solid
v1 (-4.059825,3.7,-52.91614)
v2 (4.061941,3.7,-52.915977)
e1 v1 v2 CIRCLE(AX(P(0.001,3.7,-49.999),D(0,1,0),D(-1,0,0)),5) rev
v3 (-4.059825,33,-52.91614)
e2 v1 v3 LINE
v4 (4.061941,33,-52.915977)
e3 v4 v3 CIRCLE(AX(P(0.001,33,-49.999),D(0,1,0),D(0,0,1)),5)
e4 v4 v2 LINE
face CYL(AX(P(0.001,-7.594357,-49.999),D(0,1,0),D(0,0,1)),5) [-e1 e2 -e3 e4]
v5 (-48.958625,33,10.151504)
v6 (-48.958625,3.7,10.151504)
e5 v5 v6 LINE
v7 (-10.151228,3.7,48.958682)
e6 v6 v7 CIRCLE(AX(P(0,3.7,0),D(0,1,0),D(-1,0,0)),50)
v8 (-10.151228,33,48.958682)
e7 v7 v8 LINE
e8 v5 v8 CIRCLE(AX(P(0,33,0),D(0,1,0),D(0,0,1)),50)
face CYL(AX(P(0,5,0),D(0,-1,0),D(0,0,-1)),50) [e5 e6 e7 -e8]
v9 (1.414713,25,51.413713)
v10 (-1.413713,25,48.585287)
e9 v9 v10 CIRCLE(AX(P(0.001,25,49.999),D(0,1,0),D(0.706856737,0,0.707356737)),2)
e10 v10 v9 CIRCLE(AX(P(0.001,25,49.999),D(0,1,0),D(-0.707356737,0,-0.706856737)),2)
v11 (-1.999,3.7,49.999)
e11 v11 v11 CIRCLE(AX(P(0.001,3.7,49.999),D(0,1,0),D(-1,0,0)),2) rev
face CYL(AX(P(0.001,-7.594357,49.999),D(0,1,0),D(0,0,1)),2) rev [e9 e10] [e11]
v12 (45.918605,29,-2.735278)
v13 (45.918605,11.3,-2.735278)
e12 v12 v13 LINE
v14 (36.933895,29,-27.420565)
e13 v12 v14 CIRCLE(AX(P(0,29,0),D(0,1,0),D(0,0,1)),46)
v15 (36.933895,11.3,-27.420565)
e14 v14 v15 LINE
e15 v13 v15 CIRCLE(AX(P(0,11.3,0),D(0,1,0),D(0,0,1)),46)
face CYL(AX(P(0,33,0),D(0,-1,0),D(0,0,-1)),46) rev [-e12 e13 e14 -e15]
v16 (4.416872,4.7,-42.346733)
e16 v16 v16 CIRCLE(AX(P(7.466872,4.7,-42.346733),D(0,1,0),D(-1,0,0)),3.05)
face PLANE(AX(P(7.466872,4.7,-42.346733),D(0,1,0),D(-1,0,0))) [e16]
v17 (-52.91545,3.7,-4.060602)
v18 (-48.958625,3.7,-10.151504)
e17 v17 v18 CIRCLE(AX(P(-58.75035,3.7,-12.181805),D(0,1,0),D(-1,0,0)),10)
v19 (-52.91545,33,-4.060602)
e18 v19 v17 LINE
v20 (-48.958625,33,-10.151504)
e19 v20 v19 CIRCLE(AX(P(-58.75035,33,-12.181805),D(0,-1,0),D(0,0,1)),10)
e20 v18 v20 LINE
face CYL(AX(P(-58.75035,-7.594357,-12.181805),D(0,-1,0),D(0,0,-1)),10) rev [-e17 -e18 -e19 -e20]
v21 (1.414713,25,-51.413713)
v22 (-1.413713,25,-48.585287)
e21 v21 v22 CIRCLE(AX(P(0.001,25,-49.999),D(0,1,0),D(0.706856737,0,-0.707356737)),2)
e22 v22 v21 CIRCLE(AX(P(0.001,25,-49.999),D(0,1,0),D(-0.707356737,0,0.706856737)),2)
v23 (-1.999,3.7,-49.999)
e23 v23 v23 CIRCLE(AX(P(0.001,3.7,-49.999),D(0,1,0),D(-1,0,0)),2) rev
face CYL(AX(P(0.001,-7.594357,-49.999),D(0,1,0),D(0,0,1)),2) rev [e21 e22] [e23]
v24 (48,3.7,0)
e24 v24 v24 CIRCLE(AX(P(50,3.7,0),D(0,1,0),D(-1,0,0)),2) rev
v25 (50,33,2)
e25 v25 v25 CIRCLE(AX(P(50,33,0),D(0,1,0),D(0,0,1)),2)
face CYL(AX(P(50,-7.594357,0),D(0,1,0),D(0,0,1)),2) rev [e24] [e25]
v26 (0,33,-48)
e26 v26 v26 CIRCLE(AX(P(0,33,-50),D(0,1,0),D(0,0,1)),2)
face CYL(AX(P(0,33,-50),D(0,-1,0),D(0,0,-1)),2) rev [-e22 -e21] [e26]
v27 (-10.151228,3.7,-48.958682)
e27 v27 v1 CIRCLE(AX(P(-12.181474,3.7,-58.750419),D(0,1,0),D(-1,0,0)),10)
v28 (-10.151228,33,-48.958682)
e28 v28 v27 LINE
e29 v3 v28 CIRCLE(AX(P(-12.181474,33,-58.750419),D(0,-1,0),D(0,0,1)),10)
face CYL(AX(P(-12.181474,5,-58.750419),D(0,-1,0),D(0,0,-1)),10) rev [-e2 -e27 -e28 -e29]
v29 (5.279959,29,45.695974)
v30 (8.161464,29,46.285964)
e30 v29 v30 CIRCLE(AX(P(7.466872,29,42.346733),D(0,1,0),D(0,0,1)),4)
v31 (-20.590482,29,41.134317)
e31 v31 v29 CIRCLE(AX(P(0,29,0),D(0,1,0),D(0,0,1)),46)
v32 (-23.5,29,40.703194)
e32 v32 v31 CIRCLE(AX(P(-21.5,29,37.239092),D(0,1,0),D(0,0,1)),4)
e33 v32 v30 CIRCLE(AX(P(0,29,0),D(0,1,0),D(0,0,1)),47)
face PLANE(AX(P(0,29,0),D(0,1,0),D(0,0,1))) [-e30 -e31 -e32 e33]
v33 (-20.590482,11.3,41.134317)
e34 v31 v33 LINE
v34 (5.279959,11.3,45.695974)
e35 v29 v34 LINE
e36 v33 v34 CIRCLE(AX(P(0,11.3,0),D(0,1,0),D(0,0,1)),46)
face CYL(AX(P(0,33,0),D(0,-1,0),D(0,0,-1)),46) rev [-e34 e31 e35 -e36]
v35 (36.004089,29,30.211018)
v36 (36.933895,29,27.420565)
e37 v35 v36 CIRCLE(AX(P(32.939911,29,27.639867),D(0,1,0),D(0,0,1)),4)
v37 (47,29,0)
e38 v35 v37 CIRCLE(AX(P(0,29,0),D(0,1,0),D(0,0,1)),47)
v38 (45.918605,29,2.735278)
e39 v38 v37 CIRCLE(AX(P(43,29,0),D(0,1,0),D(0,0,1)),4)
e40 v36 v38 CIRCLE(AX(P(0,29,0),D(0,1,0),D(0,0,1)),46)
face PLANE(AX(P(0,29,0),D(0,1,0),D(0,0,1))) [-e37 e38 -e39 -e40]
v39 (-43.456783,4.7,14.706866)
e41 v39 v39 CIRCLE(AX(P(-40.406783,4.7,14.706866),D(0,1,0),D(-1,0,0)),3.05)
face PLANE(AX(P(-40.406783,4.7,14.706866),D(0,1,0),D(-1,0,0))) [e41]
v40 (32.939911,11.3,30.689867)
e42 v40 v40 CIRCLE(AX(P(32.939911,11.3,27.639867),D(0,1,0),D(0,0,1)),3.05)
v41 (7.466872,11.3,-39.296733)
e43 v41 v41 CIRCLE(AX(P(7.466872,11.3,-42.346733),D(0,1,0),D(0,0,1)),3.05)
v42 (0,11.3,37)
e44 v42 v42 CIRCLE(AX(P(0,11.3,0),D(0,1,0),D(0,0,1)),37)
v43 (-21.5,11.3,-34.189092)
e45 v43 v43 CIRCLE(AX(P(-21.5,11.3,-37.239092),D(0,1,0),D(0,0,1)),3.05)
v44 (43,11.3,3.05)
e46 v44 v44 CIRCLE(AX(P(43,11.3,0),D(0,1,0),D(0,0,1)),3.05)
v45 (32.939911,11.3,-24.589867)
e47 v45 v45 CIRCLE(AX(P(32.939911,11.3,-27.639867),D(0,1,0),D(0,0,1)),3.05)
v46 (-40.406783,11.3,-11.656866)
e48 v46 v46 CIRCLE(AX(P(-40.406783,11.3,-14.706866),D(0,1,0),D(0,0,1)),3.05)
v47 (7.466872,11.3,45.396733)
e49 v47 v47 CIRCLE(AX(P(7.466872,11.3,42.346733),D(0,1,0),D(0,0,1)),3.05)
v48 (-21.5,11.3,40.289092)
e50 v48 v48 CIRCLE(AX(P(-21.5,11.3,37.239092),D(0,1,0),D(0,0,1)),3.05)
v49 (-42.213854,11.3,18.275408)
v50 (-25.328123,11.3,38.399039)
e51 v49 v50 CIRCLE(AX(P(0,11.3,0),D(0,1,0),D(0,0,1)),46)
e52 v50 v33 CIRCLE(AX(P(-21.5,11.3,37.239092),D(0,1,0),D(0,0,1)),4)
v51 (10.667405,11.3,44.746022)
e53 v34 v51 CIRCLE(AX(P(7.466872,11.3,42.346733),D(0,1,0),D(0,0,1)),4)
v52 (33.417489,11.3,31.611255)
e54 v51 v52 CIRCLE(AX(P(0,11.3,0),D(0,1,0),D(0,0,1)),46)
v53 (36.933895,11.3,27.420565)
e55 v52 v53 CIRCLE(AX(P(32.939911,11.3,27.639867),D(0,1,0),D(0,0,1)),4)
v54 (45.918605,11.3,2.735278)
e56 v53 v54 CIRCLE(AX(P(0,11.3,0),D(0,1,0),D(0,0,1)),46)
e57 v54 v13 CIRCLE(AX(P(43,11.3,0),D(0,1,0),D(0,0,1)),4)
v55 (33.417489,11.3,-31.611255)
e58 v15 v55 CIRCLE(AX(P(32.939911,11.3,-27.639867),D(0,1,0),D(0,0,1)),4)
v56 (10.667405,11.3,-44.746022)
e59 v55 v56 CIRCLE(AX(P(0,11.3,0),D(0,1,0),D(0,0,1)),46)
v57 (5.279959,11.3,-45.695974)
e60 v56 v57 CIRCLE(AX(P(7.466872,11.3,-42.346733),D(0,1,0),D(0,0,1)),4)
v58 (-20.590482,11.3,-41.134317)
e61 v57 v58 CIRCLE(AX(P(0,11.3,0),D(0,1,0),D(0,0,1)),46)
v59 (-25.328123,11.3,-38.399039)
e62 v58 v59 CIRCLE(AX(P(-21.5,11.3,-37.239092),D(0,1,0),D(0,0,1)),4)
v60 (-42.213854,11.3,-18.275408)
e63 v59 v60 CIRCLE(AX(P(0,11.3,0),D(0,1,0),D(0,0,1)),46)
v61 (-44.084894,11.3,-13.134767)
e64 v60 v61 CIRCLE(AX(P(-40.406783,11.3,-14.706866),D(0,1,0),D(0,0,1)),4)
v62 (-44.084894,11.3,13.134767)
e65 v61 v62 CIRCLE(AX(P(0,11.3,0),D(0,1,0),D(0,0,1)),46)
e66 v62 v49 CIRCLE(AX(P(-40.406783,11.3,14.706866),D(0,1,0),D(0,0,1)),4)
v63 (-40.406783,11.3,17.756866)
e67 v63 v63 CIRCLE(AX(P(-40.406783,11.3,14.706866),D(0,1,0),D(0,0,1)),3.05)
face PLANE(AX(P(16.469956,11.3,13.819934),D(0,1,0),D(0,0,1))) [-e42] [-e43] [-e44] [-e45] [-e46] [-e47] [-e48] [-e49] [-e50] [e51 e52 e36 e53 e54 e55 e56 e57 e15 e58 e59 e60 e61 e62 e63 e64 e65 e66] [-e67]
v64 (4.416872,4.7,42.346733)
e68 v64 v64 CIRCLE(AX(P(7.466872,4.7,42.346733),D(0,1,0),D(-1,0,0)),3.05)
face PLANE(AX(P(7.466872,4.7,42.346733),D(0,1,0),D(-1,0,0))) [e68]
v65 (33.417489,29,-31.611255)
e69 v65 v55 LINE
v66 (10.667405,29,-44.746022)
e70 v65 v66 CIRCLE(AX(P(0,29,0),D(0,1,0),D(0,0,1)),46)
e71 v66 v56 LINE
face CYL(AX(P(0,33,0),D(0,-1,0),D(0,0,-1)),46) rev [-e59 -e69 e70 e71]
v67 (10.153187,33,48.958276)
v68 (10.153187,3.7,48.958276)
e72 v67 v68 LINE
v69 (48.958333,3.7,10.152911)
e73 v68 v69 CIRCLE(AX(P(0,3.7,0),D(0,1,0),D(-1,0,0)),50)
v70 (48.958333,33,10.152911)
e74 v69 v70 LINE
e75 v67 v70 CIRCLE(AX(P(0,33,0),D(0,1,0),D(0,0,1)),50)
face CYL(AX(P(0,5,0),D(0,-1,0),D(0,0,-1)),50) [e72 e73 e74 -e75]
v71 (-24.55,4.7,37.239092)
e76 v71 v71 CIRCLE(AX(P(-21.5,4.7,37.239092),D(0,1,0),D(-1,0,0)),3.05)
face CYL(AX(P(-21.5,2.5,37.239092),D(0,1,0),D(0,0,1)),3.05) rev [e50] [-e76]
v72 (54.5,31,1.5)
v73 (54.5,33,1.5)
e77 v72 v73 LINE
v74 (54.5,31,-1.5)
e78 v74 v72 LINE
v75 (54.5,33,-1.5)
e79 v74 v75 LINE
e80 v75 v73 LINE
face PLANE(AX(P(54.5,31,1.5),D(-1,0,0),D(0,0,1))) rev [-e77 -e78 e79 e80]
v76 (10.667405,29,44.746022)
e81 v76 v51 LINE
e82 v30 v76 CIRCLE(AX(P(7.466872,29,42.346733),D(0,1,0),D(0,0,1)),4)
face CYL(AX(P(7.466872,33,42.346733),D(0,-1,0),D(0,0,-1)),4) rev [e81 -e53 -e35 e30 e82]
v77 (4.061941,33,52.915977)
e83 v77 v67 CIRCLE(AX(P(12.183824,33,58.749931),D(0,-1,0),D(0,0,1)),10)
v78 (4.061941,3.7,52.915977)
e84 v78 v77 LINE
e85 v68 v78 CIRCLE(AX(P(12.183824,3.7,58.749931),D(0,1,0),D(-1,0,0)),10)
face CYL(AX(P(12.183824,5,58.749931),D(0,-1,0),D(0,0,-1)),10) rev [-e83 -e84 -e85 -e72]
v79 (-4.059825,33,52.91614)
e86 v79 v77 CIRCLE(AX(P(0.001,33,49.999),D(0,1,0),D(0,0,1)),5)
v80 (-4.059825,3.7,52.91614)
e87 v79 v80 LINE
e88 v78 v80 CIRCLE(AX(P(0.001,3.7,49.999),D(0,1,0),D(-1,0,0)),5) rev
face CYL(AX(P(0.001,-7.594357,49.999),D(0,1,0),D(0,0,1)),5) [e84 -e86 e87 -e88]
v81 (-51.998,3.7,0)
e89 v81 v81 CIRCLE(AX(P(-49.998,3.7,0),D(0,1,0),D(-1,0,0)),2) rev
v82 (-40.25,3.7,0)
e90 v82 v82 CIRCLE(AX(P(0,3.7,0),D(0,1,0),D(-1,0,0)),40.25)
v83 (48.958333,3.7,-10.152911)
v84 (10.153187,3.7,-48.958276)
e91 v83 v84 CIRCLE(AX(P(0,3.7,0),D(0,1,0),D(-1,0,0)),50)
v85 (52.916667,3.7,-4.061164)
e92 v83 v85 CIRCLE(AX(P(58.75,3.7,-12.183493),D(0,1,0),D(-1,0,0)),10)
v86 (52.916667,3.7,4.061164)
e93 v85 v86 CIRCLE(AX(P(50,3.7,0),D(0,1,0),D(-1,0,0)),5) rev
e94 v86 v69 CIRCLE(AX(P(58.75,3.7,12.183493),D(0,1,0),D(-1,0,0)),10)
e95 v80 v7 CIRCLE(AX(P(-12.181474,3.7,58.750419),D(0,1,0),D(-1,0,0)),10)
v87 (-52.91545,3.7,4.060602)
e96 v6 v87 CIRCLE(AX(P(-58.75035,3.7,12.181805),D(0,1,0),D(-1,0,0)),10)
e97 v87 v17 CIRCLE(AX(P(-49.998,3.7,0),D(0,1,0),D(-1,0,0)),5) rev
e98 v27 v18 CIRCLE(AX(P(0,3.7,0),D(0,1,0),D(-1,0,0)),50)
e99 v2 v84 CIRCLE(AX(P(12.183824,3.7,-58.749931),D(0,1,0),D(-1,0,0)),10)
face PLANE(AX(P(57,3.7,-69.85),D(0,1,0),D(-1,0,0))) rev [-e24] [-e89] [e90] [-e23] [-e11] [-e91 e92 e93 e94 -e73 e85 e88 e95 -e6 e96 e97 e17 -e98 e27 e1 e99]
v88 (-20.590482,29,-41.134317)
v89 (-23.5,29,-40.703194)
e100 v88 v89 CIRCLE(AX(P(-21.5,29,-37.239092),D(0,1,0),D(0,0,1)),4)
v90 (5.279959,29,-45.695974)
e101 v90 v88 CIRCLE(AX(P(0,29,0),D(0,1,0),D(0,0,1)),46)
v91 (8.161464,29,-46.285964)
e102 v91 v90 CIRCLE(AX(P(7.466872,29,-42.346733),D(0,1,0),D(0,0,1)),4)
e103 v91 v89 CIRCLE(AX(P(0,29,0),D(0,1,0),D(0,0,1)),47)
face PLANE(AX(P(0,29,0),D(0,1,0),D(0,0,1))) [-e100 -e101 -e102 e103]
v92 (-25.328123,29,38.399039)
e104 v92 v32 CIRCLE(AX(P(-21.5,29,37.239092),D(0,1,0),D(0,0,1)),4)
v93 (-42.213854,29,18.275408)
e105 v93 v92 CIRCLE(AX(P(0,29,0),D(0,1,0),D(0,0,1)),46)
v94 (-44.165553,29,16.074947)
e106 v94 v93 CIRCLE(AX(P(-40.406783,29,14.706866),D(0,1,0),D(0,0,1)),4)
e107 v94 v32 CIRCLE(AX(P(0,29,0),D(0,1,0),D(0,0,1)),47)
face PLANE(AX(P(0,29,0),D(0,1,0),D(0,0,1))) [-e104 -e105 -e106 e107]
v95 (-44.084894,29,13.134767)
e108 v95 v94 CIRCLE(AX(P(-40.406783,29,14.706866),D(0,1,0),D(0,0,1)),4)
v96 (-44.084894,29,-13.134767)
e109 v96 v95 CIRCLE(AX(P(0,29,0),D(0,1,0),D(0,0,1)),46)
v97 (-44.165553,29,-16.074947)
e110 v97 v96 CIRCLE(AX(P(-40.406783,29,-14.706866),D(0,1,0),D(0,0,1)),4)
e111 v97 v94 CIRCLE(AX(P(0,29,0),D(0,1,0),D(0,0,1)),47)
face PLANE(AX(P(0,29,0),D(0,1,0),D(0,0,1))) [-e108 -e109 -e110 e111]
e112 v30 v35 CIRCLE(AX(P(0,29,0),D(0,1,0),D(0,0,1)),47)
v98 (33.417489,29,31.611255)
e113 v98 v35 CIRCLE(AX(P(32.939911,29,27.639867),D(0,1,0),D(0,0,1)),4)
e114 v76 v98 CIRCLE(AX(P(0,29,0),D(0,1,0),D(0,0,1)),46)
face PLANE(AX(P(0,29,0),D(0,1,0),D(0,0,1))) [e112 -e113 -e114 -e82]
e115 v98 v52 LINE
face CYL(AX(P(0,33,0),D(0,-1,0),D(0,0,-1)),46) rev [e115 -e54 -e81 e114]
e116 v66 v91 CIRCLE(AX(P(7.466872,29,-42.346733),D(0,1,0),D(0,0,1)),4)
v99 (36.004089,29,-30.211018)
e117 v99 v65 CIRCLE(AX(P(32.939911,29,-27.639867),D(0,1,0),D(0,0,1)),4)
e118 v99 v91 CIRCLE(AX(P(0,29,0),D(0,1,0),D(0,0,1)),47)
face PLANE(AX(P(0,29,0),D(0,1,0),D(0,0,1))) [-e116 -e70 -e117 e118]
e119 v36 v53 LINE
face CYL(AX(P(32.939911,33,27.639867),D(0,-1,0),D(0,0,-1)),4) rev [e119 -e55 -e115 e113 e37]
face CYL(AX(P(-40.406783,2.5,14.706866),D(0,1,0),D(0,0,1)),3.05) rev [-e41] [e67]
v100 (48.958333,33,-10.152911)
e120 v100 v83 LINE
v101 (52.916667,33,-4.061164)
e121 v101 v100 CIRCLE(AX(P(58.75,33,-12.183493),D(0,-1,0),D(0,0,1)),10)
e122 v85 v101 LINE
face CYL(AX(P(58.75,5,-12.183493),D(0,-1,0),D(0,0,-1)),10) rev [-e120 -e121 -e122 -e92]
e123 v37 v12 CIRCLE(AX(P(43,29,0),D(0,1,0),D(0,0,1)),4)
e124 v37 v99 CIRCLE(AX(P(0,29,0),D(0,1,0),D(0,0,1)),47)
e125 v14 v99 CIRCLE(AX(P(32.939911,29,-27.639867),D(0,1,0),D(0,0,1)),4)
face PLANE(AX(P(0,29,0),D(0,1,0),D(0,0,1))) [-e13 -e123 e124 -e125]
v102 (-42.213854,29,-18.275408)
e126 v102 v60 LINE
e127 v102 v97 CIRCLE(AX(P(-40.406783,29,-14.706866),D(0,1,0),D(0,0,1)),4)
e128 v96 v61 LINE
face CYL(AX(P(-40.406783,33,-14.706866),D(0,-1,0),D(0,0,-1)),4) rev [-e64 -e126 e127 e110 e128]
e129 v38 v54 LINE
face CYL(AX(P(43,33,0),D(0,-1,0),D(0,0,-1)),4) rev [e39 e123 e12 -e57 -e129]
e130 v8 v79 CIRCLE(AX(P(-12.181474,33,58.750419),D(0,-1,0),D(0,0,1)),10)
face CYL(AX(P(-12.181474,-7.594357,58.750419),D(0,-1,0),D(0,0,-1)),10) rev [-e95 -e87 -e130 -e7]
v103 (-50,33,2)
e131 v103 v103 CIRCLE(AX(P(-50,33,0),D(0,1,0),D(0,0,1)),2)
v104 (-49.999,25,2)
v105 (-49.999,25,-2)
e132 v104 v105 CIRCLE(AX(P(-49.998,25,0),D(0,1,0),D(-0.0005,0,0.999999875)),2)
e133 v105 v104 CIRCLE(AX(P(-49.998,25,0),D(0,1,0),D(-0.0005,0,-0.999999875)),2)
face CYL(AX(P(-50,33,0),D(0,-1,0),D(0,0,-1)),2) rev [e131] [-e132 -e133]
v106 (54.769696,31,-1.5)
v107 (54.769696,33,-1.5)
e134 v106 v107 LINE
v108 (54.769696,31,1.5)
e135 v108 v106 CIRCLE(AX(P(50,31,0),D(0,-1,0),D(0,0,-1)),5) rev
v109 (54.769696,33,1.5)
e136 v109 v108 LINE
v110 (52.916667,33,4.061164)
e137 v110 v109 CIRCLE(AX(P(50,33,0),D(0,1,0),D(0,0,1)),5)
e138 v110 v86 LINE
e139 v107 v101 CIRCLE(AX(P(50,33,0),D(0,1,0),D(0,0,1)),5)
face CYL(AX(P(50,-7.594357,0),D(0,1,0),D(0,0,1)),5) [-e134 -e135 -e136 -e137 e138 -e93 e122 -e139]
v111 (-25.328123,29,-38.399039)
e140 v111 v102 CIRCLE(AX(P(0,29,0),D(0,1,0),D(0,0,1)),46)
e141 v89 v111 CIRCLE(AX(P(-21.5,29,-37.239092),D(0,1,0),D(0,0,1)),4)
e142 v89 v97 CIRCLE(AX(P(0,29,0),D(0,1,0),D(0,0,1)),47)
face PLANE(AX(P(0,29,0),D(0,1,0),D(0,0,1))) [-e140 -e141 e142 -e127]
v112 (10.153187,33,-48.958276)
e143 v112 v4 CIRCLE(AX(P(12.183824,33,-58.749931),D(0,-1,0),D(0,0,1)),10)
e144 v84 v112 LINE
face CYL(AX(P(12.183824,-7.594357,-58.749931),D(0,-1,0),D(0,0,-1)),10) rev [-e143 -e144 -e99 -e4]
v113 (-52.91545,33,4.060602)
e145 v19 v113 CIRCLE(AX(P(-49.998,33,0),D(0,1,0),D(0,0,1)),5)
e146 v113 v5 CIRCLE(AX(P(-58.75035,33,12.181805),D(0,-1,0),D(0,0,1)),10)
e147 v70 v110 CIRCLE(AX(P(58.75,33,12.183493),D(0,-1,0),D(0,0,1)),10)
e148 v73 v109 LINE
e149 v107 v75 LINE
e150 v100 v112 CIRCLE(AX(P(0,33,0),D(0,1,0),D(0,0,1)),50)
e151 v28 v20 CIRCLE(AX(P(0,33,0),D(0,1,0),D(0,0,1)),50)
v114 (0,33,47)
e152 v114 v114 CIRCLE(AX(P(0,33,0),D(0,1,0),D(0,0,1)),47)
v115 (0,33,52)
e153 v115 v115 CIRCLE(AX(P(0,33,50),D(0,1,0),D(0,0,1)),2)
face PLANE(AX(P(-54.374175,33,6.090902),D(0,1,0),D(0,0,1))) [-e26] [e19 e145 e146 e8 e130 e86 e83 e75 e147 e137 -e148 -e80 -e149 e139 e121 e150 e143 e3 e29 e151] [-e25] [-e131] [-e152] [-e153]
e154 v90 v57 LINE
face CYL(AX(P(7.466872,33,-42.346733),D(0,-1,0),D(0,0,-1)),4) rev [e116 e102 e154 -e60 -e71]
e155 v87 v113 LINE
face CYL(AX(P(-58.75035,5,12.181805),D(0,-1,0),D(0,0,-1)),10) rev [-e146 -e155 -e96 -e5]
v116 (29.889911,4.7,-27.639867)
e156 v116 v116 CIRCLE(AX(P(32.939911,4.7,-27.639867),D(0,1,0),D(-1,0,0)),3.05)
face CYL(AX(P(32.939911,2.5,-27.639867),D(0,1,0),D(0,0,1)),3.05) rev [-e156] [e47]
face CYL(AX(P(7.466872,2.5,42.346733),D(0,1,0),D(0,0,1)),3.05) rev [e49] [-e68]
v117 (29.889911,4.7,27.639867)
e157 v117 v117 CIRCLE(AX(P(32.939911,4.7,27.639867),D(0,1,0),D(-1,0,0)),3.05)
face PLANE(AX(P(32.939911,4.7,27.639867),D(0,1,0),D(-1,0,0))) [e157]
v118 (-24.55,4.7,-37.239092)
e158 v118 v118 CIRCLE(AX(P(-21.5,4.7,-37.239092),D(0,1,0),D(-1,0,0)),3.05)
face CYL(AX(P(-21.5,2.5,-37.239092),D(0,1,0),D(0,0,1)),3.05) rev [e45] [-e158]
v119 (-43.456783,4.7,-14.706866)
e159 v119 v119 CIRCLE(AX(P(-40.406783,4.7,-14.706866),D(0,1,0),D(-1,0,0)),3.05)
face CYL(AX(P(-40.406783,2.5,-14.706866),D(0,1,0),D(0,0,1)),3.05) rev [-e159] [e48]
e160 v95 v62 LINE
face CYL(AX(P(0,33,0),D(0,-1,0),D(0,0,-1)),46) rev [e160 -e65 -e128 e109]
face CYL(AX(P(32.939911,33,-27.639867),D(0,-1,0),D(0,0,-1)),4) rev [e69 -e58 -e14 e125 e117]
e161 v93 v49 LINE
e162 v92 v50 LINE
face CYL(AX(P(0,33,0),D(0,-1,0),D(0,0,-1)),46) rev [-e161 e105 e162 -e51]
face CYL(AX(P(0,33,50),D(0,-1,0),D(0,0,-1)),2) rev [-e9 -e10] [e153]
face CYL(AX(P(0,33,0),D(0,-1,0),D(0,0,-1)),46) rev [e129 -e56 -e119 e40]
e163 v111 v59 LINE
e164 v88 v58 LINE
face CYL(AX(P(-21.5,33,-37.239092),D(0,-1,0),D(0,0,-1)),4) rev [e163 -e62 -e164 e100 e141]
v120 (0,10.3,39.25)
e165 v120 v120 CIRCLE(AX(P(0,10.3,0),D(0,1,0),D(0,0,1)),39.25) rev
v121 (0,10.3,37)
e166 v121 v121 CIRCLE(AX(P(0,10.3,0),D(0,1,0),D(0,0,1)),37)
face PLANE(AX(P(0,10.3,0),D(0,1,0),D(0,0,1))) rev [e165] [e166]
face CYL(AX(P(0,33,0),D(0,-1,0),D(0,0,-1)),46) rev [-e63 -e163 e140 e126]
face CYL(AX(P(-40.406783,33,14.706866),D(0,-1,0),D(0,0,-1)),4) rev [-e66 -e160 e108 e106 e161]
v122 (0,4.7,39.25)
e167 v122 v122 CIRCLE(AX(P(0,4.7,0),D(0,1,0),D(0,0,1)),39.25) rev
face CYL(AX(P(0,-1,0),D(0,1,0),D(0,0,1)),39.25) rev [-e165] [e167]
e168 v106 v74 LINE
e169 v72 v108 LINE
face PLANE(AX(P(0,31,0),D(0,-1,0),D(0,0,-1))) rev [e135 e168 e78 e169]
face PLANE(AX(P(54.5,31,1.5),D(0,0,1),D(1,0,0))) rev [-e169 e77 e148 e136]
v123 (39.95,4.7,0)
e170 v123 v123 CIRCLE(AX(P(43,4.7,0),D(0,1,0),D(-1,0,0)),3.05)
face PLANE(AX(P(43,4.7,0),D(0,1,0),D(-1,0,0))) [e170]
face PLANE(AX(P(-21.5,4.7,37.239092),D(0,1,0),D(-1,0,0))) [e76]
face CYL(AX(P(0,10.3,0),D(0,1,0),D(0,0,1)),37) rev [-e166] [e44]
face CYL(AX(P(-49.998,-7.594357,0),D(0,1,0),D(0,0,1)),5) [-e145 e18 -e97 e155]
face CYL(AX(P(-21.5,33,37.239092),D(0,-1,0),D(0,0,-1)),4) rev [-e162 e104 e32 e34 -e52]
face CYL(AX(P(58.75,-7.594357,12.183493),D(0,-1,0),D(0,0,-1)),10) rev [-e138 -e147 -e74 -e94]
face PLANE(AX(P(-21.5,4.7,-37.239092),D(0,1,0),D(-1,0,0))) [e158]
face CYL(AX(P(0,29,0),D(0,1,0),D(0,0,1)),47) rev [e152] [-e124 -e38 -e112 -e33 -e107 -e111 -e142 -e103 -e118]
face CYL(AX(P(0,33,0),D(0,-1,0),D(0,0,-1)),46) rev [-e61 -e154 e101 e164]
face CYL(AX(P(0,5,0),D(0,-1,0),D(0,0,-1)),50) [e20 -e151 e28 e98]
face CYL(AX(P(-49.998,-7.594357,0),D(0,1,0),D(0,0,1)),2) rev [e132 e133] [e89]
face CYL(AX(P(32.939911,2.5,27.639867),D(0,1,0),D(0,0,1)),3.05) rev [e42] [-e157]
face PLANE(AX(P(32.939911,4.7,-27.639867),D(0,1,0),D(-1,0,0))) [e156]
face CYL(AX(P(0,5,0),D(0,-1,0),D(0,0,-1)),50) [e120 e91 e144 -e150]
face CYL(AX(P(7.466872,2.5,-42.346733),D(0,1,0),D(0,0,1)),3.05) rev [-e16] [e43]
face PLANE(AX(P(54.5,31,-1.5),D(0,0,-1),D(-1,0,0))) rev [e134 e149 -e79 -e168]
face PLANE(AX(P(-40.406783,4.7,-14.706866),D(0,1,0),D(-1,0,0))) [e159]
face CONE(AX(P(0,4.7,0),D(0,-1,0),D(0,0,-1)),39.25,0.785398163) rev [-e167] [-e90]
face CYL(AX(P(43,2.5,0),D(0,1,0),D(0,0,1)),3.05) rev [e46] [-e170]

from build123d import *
from build123d.topology import SkipClean

# Parameters (mm, degrees)
SKETCH1_R            = 50
BOSS_EXTRUDE1_DEPTH  = 5
SKETCH2_R            = 3
BOSS_EXTRUDE2_DEPTH  = 30
SKETCH3_R            = 50
BOSS_EXTRUDE3_DEPTH  = 28
SKETCH4_R            = 39.25
CUT_EXTRUDE1_DEPTH   = 6
SKETCH5_R            = 3
CUT_EXTRUDE2_DEPTH   = 44
SKETCH6_R            = 50
SKETCH6_R_2          = 39
BOSS_EXTRUDE4_DEPTH  = 3
CUT_EXTRUDE3_START   = -4
SKETCH7_R            = 47
SKETCH7_R_2          = 46
CUT_EXTRUDE3_DEPTH   = 4
SKETCH8_R            = 39
SKETCH8_R_2          = 37
BOSS_EXTRUDE5_DEPTH  = 1
SKETCH9_R            = 5
SKETCH9_R_2          = 2
BOSS_EXTRUDE6_DEPTH  = 33
SKETCH10_R           = 3.05
CUT_EXTRUDE6_DEPTH   = 2.5
SKETCH11_R           = 47.15
CUT_EXTRUDE7_DEPTH   = 4
SKETCH12_R           = 39.25
SKETCH12_R_2         = 3.05
BOSS_EXTRUDE7_DEPTH  = 6.3
BOSS_EXTRUDE8_START  = -1
SKETCH13_R           = 39.25
SKETCH13_R_2         = 37
BOSS_EXTRUDE8_DEPTH  = 1
SKETCH14_W           = 114
SKETCH14_H           = 3
CUT_EXTRUDE8_DEPTH   = 59.5
SKETCH15_R           = 39.25
SKETCH15_R_2         = 2
BOSS_EXTRUDE9_DEPTH  = 1
SKETCH16_R           = 3.05
BOSS_EXTRUDE10_DEPTH = 0.7
SKETCH17_W           = 114.080184059
SKETCH17_H           = 0.7
CUT_EXTRUDE9_DEPTH   = 69.85
CUT_EXTRUDE10_START  = -8
CUT_EXTRUDE10_DEPTH  = 8
CUT_EXTRUDE12_START  = -21.3
SKETCH20_R           = 57
SKETCH20_R_2         = 50
CUT_EXTRUDE12_DEPTH  = 21.3
BOSS_EXTRUDE11_START = -21.3
BOSS_EXTRUDE11_DEPTH = 21.3
CUT_EXTRUDE13_START  = -21.3
CUT_EXTRUDE13_DEPTH  = 21.3
FILLET1_R            = 10
SKETCH23_R           = 2
BOSS_EXTRUDE12_DEPTH = 8
CUT_EXTRUDE14_START  = -4
SKETCH24_R           = 47
SKETCH24_R_2         = 46
CUT_EXTRUDE14_DEPTH  = 4
SKETCH25_W           = 1
SKETCH25_H           = 3
CUT_EXTRUDE15_DEPTH  = 2
CHAMFER1_SIZE        = 1


# Read off the part's stored shape, not the designer's step: Cut-Extrude13
with BuildPart() as part:
    # Sketch1 → Boss-Extrude1 (new body)
    with BuildSketch(Plane(origin=(0, 0, 0), x_dir=(1, 0, 0), z_dir=(0, 1, 0))):
        with Locations(Location((0, 0, 0), (0, 0, 270))):
            Circle(SKETCH1_R)
    extrude(amount=BOSS_EXTRUDE1_DEPTH)

    # Sketch2 → Boss-Extrude2 (add)
    with BuildSketch(Plane(origin=(0, 5, 0), x_dir=(1, 0, 0), z_dir=(0, 1, 0))):
        with Locations(Location((43, 0, 0), (0, 0, 270))):
            Circle(SKETCH2_R)
        with Locations(Location((32.939911054, -27.639867217, 0), (0, 0, 270))):
            Circle(SKETCH2_R)
        with Locations(Location((7.46687164, -42.34673338, 0), (0, 0, 270))):
            Circle(SKETCH2_R)
        with Locations(Location((-21.5, -37.239092363, 0), (0, 0, 270))):
            Circle(SKETCH2_R)
        with Locations(Location((-40.406782694, -14.706866163, 0), (0, 0, 270))):
            Circle(SKETCH2_R)
        with Locations(Location((-40.406782694, 14.706866163, 0), (0, 0, 270))):
            Circle(SKETCH2_R)
        with Locations(Location((-21.5, 37.239092363, 0), (0, 0, 270))):
            Circle(SKETCH2_R)
        with Locations(Location((7.46687164, 42.34673338, 0), (0, 0, 270))):
            Circle(SKETCH2_R)
        with Locations(Location((32.939911054, 27.639867217, 0), (0, 0, 270))):
            Circle(SKETCH2_R)
    extrude(amount=BOSS_EXTRUDE2_DEPTH)

    # Sketch3 → Boss-Extrude3 (add)
    with BuildSketch(Plane(origin=(0, 5, 0), x_dir=(1, 0, 0), z_dir=(0, 1, 0))):
        with Locations(Location((0, 0, 0), (0, 0, 270))):
            Circle(SKETCH3_R)
        with BuildLine():
            ThreePointArc((45.918604651, 2.735278211), (43.225860556, 15.732926593), (36.933894872, 27.42056545))
            ThreePointArc((36.933894872, 27.42056545), (36.004088827, 30.211017655), (33.417488986, 31.611254798))
            ThreePointArc((33.417488986, 31.611254798), (23, 39.837168574), (10.667405207, 44.746021791))
            ThreePointArc((10.667405207, 44.746021791), (8.16146435, 46.285964392), (5.27995883, 45.695973945))
            ThreePointArc((5.27995883, 45.695973945), (-7.987816173, 45.301156639), (-20.590481909, 41.13431724))
            ThreePointArc((-20.590481909, 41.13431724), (-23.5, 40.703193978), (-25.328122743, 38.399039029))
            ThreePointArc((-25.328122743, 38.399039029), (-35.238044383, 29.568230046), (-42.213853702, 18.275408495))
            ThreePointArc((-42.213853702, 18.275408495), (-44.165553177, 16.074946736), (-44.084894193, 13.134766994))
            ThreePointArc((-44.084894193, 13.134766994), (-46, 0), (-44.084894193, -13.134766994))
            ThreePointArc((-44.084894193, -13.134766994), (-44.165553177, -16.074946736), (-42.213853702, -18.275408495))
            ThreePointArc((-42.213853702, -18.275408495), (-35.238044383, -29.568230046), (-25.328122743, -38.399039029))
            ThreePointArc((-25.328122743, -38.399039029), (-23.5, -40.703193978), (-20.590481909, -41.13431724))
            ThreePointArc((-20.590481909, -41.13431724), (-7.987816173, -45.301156639), (5.27995883, -45.695973945))
            ThreePointArc((5.27995883, -45.695973945), (8.16146435, -46.285964392), (10.667405207, -44.746021791))
            ThreePointArc((10.667405207, -44.746021791), (23, -39.837168574), (33.417488986, -31.611254798))
            ThreePointArc((33.417488986, -31.611254798), (36.004088827, -30.211017655), (36.933894872, -27.42056545))
            ThreePointArc((36.933894872, -27.42056545), (43.225860556, -15.732926593), (45.918604651, -2.735278211))
            ThreePointArc((45.918604651, -2.735278211), (47, 0), (45.918604651, 2.735278211))
        make_face(mode=Mode.SUBTRACT)
    extrude(amount=BOSS_EXTRUDE3_DEPTH)

    # Sketch4 → Cut-Extrude1 (cut)
    with BuildSketch(Plane(origin=(0, 5, 0), x_dir=(1, 0, 0), z_dir=(0, 1, 0))):
        with Locations(Location((0, 0, 0), (0, 0, 270))):
            Circle(SKETCH4_R)
    extrude(amount=-CUT_EXTRUDE1_DEPTH, mode=Mode.SUBTRACT)

    # Sketch5 → Cut-Extrude2 (cut, symmetric)
    with BuildSketch(Plane(origin=(0, 5, 0), x_dir=(1, 0, 0), z_dir=(0, 1, 0))):
        with Locations(Location((43, 0, 0), (0, 0, 270))):
            Circle(SKETCH5_R)
        with Locations(Location((32.939911054, -27.639867217, 0), (0, 0, 270))):
            Circle(SKETCH5_R)
        with Locations(Location((7.46687164, -42.34673338, 0), (0, 0, 270))):
            Circle(SKETCH5_R)
        with Locations(Location((-21.5, -37.239092363, 0), (0, 0, 270))):
            Circle(SKETCH5_R)
        with Locations(Location((-40.406782694, -14.706866163, 0), (0, 0, 270))):
            Circle(SKETCH5_R)
        with Locations(Location((-40.406782694, 14.706866163, 0), (0, 0, 270))):
            Circle(SKETCH5_R)
        with Locations(Location((-21.5, 37.239092363, 0), (0, 0, 270))):
            Circle(SKETCH5_R)
        with Locations(Location((7.46687164, 42.34673338, 0), (0, 0, 270))):
            Circle(SKETCH5_R)
        with Locations(Location((32.939911054, 27.639867217, 0), (0, 0, 270))):
            Circle(SKETCH5_R)
    extrude(amount=CUT_EXTRUDE2_DEPTH, both=True, mode=Mode.SUBTRACT)

    # Sketch6 → Boss-Extrude4 (add)
    with BuildSketch(Plane.XZ):
        with Locations(Location((0, 0, 0), (0, 0, 90))):
            Circle(SKETCH6_R)
        with Locations(Location((0, 0, 0), (0, 0, 270))):
            Circle(SKETCH6_R_2, mode=Mode.SUBTRACT)
    extrude(amount=-BOSS_EXTRUDE4_DEPTH)

    # Sketch7 → Cut-Extrude3 (cut)
    with BuildSketch(Plane(origin=(0, 33, 0), x_dir=(1, 0, 0), z_dir=(0, 1, 0)).offset(CUT_EXTRUDE3_START)):
        with Locations(Location((0, 0, 0), (0, 0, 270))):
            Circle(SKETCH7_R)
        Circle(SKETCH7_R_2, mode=Mode.SUBTRACT)
    extrude(amount=CUT_EXTRUDE3_DEPTH, mode=Mode.SUBTRACT)

    # Sketch8 → Boss-Extrude5 (add)
    with BuildSketch(Plane.XZ):
        with Locations(Location((0, 0, 0), (0, 0, 270))):
            Circle(SKETCH8_R)
        with Locations(Location((0, 0, 0), (0, 0, 270))):
            Circle(SKETCH8_R_2, mode=Mode.SUBTRACT)
    extrude(amount=-BOSS_EXTRUDE5_DEPTH)

    # Sketch9 → Boss-Extrude6 (add)
    # profile 1 of 4: a face of its own
    with BuildSketch(Plane(origin=(0, 33, 0), x_dir=(1, 0, 0), z_dir=(0, 1, 0))):
        with Locations((52, 0)):
            Circle(SKETCH9_R)
        with Locations(Location((52, 0, 0), (0, 0, 270))):
            Circle(SKETCH9_R_2, mode=Mode.SUBTRACT)
    # profile 2 of 4: a face of its own
    with BuildSketch(Plane(origin=(0, 33, 0), x_dir=(1, 0, 0), z_dir=(0, 1, 0))):
        with Locations((-52, 0)):
            Circle(SKETCH9_R)
        with Locations(Location((-52, 0, 0), (0, 0, 270))):
            Circle(SKETCH9_R_2, mode=Mode.SUBTRACT)
    # profile 3 of 4: a face of its own
    with BuildSketch(Plane(origin=(0, 33, 0), x_dir=(1, 0, 0), z_dir=(0, 1, 0))):
        with Locations((0, 52)):
            Circle(SKETCH9_R)
        with Locations(Location((0, 52, 0), (0, 0, 270))):
            Circle(SKETCH9_R_2, mode=Mode.SUBTRACT)
    # profile 4 of 4: a face of its own
    with BuildSketch(Plane(origin=(0, 33, 0), x_dir=(1, 0, 0), z_dir=(0, 1, 0))):
        with Locations((0, -52)):
            Circle(SKETCH9_R)
        with Locations(Location((0, -52, 0), (0, 0, 270))):
            Circle(SKETCH9_R_2, mode=Mode.SUBTRACT)
    extrude(amount=-BOSS_EXTRUDE6_DEPTH)

    # Sketch10 → Cut-Extrude6 (cut)
    with BuildSketch(Plane(origin=(0, 5, 0), x_dir=(1, 0, 0), z_dir=(0, 1, 0))):
        with Locations(Location((32.939911054, -27.639867217, 0), (0, 0, 270))):
            Circle(SKETCH10_R)
        with Locations(Location((43, 0, 0), (0, 0, 270))):
            Circle(SKETCH10_R)
        with Locations(Location((7.46687164, -42.34673338, 0), (0, 0, 270))):
            Circle(SKETCH10_R)
        with Locations(Location((-21.5, -37.239092363, 0), (0, 0, 270))):
            Circle(SKETCH10_R)
        with Locations(Location((-40.406782694, -14.706866163, 0), (0, 0, 270))):
            Circle(SKETCH10_R)
        with Locations(Location((-40.406782694, 14.706866163, 0), (0, 0, 270))):
            Circle(SKETCH10_R)
        with Locations(Location((-21.5, 37.239092363, 0), (0, 0, 270))):
            Circle(SKETCH10_R)
        with Locations(Location((7.46687164, 42.34673338, 0), (0, 0, 270))):
            Circle(SKETCH10_R)
        with Locations(Location((32.939911054, 27.639867217, 0), (0, 0, 270))):
            Circle(SKETCH10_R)
    extrude(amount=-CUT_EXTRUDE6_DEPTH, mode=Mode.SUBTRACT)

    # Sketch11 → Cut-Extrude7 (cut)
    with BuildSketch(Plane(origin=(0, 33, 0), x_dir=(1, 0, 0), z_dir=(0, 1, 0))):
        with Locations(Location((0, 0, 0), (0, 0, 270))):
            Circle(SKETCH11_R)
    extrude(amount=-CUT_EXTRUDE7_DEPTH, mode=Mode.SUBTRACT)

    # Sketch12 → Boss-Extrude7 (add)
    with BuildSketch(Plane(origin=(0, 5, 0), x_dir=(1, 0, 0), z_dir=(0, 1, 0))):
        with BuildLine():
            ThreePointArc((36.933894872, -27.42056545), (43.225860556, -15.732926593), (45.918604651, -2.735278211))
            ThreePointArc((45.918604651, -2.735278211), (47, 0), (45.918604651, 2.735278211))
            ThreePointArc((45.918604651, 2.735278211), (43.225860556, 15.732926593), (36.933894872, 27.42056545))
            ThreePointArc((36.933894872, 27.42056545), (36.004088827, 30.211017655), (33.417488986, 31.611254798))
            ThreePointArc((33.417488986, 31.611254798), (23, 39.837168574), (10.667405207, 44.746021791))
            ThreePointArc((10.667405207, 44.746021791), (8.16146435, 46.285964392), (5.27995883, 45.695973945))
            ThreePointArc((5.27995883, 45.695973945), (-7.987816173, 45.301156639), (-20.590481909, 41.13431724))
            ThreePointArc((-20.590481909, 41.13431724), (-23.5, 40.703193978), (-25.328122743, 38.399039029))
            ThreePointArc((-25.328122743, 38.399039029), (-35.238044383, 29.568230046), (-42.213853702, 18.275408495))
            ThreePointArc((-42.213853702, 18.275408495), (-44.165553177, 16.074946736), (-44.084894193, 13.134766994))
            ThreePointArc((-44.084894193, 13.134766994), (-46, 0), (-44.084894193, -13.134766994))
            ThreePointArc((-44.084894193, -13.134766994), (-44.165553177, -16.074946736), (-42.213853702, -18.275408495))
            ThreePointArc((-42.213853702, -18.275408495), (-35.238044383, -29.568230046), (-25.328122743, -38.399039029))
            ThreePointArc((-25.328122743, -38.399039029), (-23.5, -40.703193978), (-20.590481909, -41.13431724))
            ThreePointArc((-20.590481909, -41.13431724), (-7.987816173, -45.301156639), (5.27995883, -45.695973945))
            ThreePointArc((5.27995883, -45.695973945), (8.16146435, -46.285964392), (10.667405207, -44.746021791))
            ThreePointArc((10.667405207, -44.746021791), (23, -39.837168574), (33.417488986, -31.611254798))
            ThreePointArc((33.417488986, -31.611254798), (36.004088827, -30.211017655), (36.933894872, -27.42056545))
        make_face()
        with Locations(Location((0, 0, 0), (0, 0, 270))):
            Circle(SKETCH12_R, mode=Mode.SUBTRACT)
        with Locations(Location((32.939911054, -27.639867217, 0), (0, 0, 270))):
            Circle(SKETCH12_R_2, mode=Mode.SUBTRACT)
        with Locations(Location((43, 0, 0), (0, 0, 270))):
            Circle(SKETCH12_R_2, mode=Mode.SUBTRACT)
        with Locations(Location((7.46687164, -42.34673338, 0), (0, 0, 270))):
            Circle(SKETCH12_R_2, mode=Mode.SUBTRACT)
        with Locations(Location((-21.5, -37.239092363, 0), (0, 0, 270))):
            Circle(SKETCH12_R_2, mode=Mode.SUBTRACT)
        with Locations(Location((-40.406782694, -14.706866163, 0), (0, 0, 270))):
            Circle(SKETCH12_R_2, mode=Mode.SUBTRACT)
        with Locations(Location((-40.406782694, 14.706866163, 0), (0, 0, 270))):
            Circle(SKETCH12_R_2, mode=Mode.SUBTRACT)
        with Locations(Location((-21.5, 37.239092363, 0), (0, 0, 270))):
            Circle(SKETCH12_R_2, mode=Mode.SUBTRACT)
        with Locations(Location((7.46687164, 42.34673338, 0), (0, 0, 270))):
            Circle(SKETCH12_R_2, mode=Mode.SUBTRACT)
        with Locations(Location((32.939911054, 27.639867217, 0), (0, 0, 270))):
            Circle(SKETCH12_R_2, mode=Mode.SUBTRACT)
    extrude(amount=BOSS_EXTRUDE7_DEPTH)

    # Sketch13 → Boss-Extrude8 (add)
    with BuildSketch(Plane(origin=(0, 11.3, 0), x_dir=(1, 0, 0), z_dir=(0, 1, 0)).offset(BOSS_EXTRUDE8_START)):
        with Locations(Location((0, 0, 0), (0, 0, 270))):
            Circle(SKETCH13_R)
        with Locations(Location((0, 0, 0), (0, 0, 90))):
            Circle(SKETCH13_R_2, mode=Mode.SUBTRACT)
    extrude(amount=BOSS_EXTRUDE8_DEPTH)

    # Sketch14 → Cut-Extrude8 (cut, symmetric)
    with BuildSketch(Plane.XY):
        with Locations((0, 1.5)):
            Rectangle(SKETCH14_W, SKETCH14_H)
    extrude(amount=CUT_EXTRUDE8_DEPTH, both=True, mode=Mode.SUBTRACT)

    # Sketch15 → Boss-Extrude9 (add)
    with BuildSketch(Plane.XZ.offset(-3)):
        with BuildLine():
            ThreePointArc((4.489046086, -49.798076923), (35.355339059, -35.355339059), (49.798076923, -4.489046086))
            ThreePointArc((49.798076923, -4.489046086), (57, 0), (49.798076923, 4.489046086))
            ThreePointArc((49.798076923, 4.489046086), (35.355339059, 35.355339059), (4.489046086, 49.798076923))
            ThreePointArc((4.489046086, 49.798076923), (0, 57), (-4.489046086, 49.798076923))
            ThreePointArc((-4.489046086, 49.798076923), (-35.355339059, 35.355339059), (-49.798076923, 4.489046086))
            ThreePointArc((-49.798076923, 4.489046086), (-57, 0), (-49.798076923, -4.489046086))
            ThreePointArc((-49.798076923, -4.489046086), (-35.355339059, -35.355339059), (-4.489046086, -49.798076923))
            ThreePointArc((-4.489046086, -49.798076923), (0, -57), (4.489046086, -49.798076923))
        make_face()
        with Locations(Location((0, 0, 0), (0, 0, 90))):
            Circle(SKETCH15_R, mode=Mode.SUBTRACT)
        with Locations(Location((0, -52, 0), (0, 0, 90))):
            Circle(SKETCH15_R_2, mode=Mode.SUBTRACT)
        with Locations(Location((52, 0, 0), (0, 0, 90))):
            Circle(SKETCH15_R_2, mode=Mode.SUBTRACT)
        with Locations(Location((-52, 0, 0), (0, 0, 180))):
            Circle(SKETCH15_R_2, mode=Mode.SUBTRACT)
        with Locations(Location((0, 52, 0), (0, 0, 180))):
            Circle(SKETCH15_R_2, mode=Mode.SUBTRACT)
    extrude(amount=-BOSS_EXTRUDE9_DEPTH)

    # Sketch16 → Boss-Extrude10 (add)
    with BuildSketch(Plane(origin=(0, 4, 0), x_dir=(1, 0, 0), z_dir=(0, 1, 0))):
        with Locations(Location((32.939911054, -27.639867217, 0), (0, 0, 270))):
            Circle(SKETCH16_R)
        with Locations(Location((43, 0, 0), (0, 0, 270))):
            Circle(SKETCH16_R)
        with Locations(Location((7.46687164, -42.34673338, 0), (0, 0, 270))):
            Circle(SKETCH16_R)
        with Locations(Location((-21.5, -37.239092363, 0), (0, 0, 270))):
            Circle(SKETCH16_R)
        with Locations(Location((-40.406782694, -14.706866163, 0), (0, 0, 270))):
            Circle(SKETCH16_R)
        with Locations(Location((-40.406782694, 14.706866163, 0), (0, 0, 270))):
            Circle(SKETCH16_R)
        with Locations(Location((-21.5, 37.239092363, 0), (0, 0, 270))):
            Circle(SKETCH16_R)
        with Locations(Location((7.46687164, 42.34673338, 0), (0, 0, 270))):
            Circle(SKETCH16_R)
        with Locations(Location((32.939911054, 27.639867217, 0), (0, 0, 270))):
            Circle(SKETCH16_R)
    extrude(amount=BOSS_EXTRUDE10_DEPTH)

    # Sketch17 → Cut-Extrude9 (cut, symmetric)
    with BuildSketch(Plane.XY):
        with Locations((-0.04009203, 3.35)):
            Rectangle(SKETCH17_W, SKETCH17_H)
    extrude(amount=CUT_EXTRUDE9_DEPTH, both=True, mode=Mode.SUBTRACT)

    # Sketch18 → Cut-Extrude10 (cut)
    with BuildSketch(Plane(origin=(0, 33, 0), x_dir=(1, 0, 0), z_dir=(0, 1, 0)).offset(CUT_EXTRUDE10_START)):
        with BuildLine():
            ThreePointArc((4.489046086, -49.798076923), (35.355339059, -35.355339059), (49.798076923, -4.489046086))
            ThreePointArc((49.798076923, -4.489046086), (57, 0), (49.798076923, 4.489046086))
            ThreePointArc((49.798076923, 4.489046086), (35.355339059, 35.355339059), (4.489046086, 49.798076923))
            ThreePointArc((4.489046086, 49.798076923), (0, 57), (-4.489046086, 49.798076923))
            ThreePointArc((-4.489046086, 49.798076923), (-35.355339059, 35.355339059), (-49.798076923, 4.489046086))
            ThreePointArc((-49.798076923, 4.489046086), (-57, 0), (-49.798076923, -4.489046086))
            ThreePointArc((-49.798076923, -4.489046086), (-35.355339059, -35.355339059), (-4.489046086, -49.798076923))
            ThreePointArc((-4.489046086, -49.798076923), (0, -57), (4.489046086, -49.798076923))
        make_face()
    extrude(amount=CUT_EXTRUDE10_DEPTH, mode=Mode.SUBTRACT)

    # Sketch20 → Cut-Extrude12 (cut)
    with BuildSketch(Plane(origin=(0, 25, 0), x_dir=(1, 0, 0), z_dir=(0, 1, 0)).offset(CUT_EXTRUDE12_START)):
        Circle(SKETCH20_R)
        with Locations(Location((0, 0, 0), (0, 0, 180))):
            Circle(SKETCH20_R_2, mode=Mode.SUBTRACT)
    extrude(amount=CUT_EXTRUDE12_DEPTH, mode=Mode.SUBTRACT)

    # Sketch21 → Boss-Extrude11 (add)
    with BuildSketch(Plane(origin=(0, 25, 0), x_dir=(1, 0, 0), z_dir=(0, 1, 0)).offset(BOSS_EXTRUDE11_START)):
        with BuildLine():
            ThreePointArc((49.96, 1.99959996), (51.4, 1.428285686), (52, 0))
            ThreePointArc((52, 0), (51.4, -1.428285686), (49.96, -1.99959996))
            ThreePointArc((49.96, -1.99959996), (49.877472397, -3.498249168), (49.75, -4.993746089))
            ThreePointArc((49.75, -4.993746089), (55, 0), (49.75, 4.993746089))
            ThreePointArc((49.75, 4.993746089), (49.877472397, 3.498249168), (49.96, 1.99959996))
        make_face()
        with BuildLine():
            ThreePointArc((-4.992800781, -49.750094878), (0.001100002, -54.998999999), (4.994790821, -49.749895122))
            ThreePointArc((4.994790821, -49.749895122), (3.499281509, -49.877399982), (2.000618918, -49.959959207))
            ThreePointArc((2.000618918, -49.959959207), (2.000904727, -49.979478673), (2.001, -49.999))
            ThreePointArc((2.001, -49.999), (-0.018481328, -51.998905117), (-1.998620478, -49.960039193))
            ThreePointArc((-1.998620478, -49.960039193), (-3.497286371, -49.877539916), (-4.992800781, -49.750094878))
        make_face()
        with BuildLine():
            ThreePointArc((-49.95999844, 1.999638938), (-49.877467544, 3.498318366), (-49.74999004, 4.993845318))
            ThreePointArc((-49.74999004, 4.993845318), (-54.998, 0), (-49.74999004, -4.993845318))
            ThreePointArc((-49.74999004, -4.993845318), (-49.877467544, -3.498318366), (-49.95999844, -1.999638938))
            ThreePointArc((-49.95999844, -1.999638938), (-51.998, 0), (-49.95999844, 1.999638938))
        make_face()
        with BuildLine():
            ThreePointArc((2.000618918, 49.959959207), (3.499281509, 49.877399982), (4.994790821, 49.749895122))
            ThreePointArc((4.994790821, 49.749895122), (0.001100002, 54.998999999), (-4.992800781, 49.750094878))
            ThreePointArc((-4.992800781, 49.750094878), (-3.497286371, 49.877539916), (-1.998620478, 49.960039193))
            ThreePointArc((-1.998620478, 49.960039193), (-0.018481328, 51.998905117), (2.001, 49.999))
            ThreePointArc((2.001, 49.999), (2.000904727, 49.979478673), (2.000618918, 49.959959207))
        make_face()
    extrude(amount=BOSS_EXTRUDE11_DEPTH)

    # Cut-Extrude13 outline → Cut-Extrude13 (cut)
    with SkipClean():  # the faces are left unmerged after this step: merging them gives an invalid solid
        with BuildSketch(Plane(origin=(0, 25, 0), x_dir=(1, 0, 0), z_dir=(0, 1, 0)).offset(CUT_EXTRUDE13_START)):
            with BuildLine():
                ThreePointArc((49.96, -1.99959996), (50, 0), (49.96, 1.99959996))
                ThreePointArc((49.96, 1.99959996), (48, 0), (49.96, -1.99959996))
            make_face()
            with BuildLine():
                ThreePointArc((-1.998620478, -49.960039193), (0.00100002, -49.99999999), (2.000618918, -49.959959207))
                ThreePointArc((2.000618918, -49.959959207), (0.000959999, -47.999), (-1.998620478, -49.960039193))
            make_face()
            with BuildLine():
                ThreePointArc((-49.95999844, -1.999638938), (-47.998, 0), (-49.95999844, 1.999638938))
                ThreePointArc((-49.95999844, 1.999638938), (-50, 0), (-49.95999844, -1.999638938))
            make_face()
            with BuildLine():
                ThreePointArc((2.000618918, 49.959959207), (0.00100002, 49.99999999), (-1.998620478, 49.960039193))
                ThreePointArc((-1.998620478, 49.960039193), (0.000959999, 47.999), (2.000618918, 49.959959207))
            make_face()
        extrude(amount=CUT_EXTRUDE13_DEPTH, mode=Mode.SUBTRACT)

    # Fillet1
    fillet1_edges = [part.edges().sort_by_distance(p)[0] for p in [
        (49.75, 14.35, 4.993746089),
        (49.75, 14.35, -4.993746089),
        (-4.992800781, 14.35, 49.750094878),
        (4.994790821, 14.35, 49.749895122),
        (-49.74999004, 14.35, -4.993845318),
        (-49.74999004, 14.35, 4.993845318),
        (4.994790821, 14.35, -49.749895122),
        (-4.992800781, 14.35, -49.750094878),
    ]]
    fillet(fillet1_edges, radius=FILLET1_R)

    # Sketch23 → Boss-Extrude12 (add)
    with SkipClean():  # the faces are left unmerged after this step: merging them gives an invalid solid
        with BuildSketch(Plane(origin=(0, 25, 0), x_dir=(1, 0, 0), z_dir=(0, 1, 0))):
            with BuildLine():
                ThreePointArc((-48.958625045, -10.151504012), (-35.355239503, -35.355438615), (-10.151228289, -48.958682215))
                ThreePointArc((-10.151228289, -48.958682215), (-6.733482579, -50.364752909), (-4.059824649, -52.916139553))
                ThreePointArc((-4.059824649, -52.916139553), (0.001100002, -54.998999999), (4.061941334, -52.915977114))
                ThreePointArc((4.061941334, -52.915977114), (6.735497204, -50.364483524), (10.153186668, -48.958276118))
                ThreePointArc((10.153186668, -48.958276118), (35.355438677, -35.355239441), (48.958333333, -10.152910776))
                ThreePointArc((48.958333333, -10.152910776), (50.364745084, -6.734869252), (52.916666667, -4.06116431))
                ThreePointArc((52.916666667, -4.06116431), (55, 0), (52.916666667, 4.06116431))
                ThreePointArc((52.916666667, 4.06116431), (50.364745084, 6.734869252), (48.958333333, 10.152910776))
                ThreePointArc((48.958333333, 10.152910776), (35.355438677, 35.355239441), (10.153186668, 48.958276118))
                ThreePointArc((10.153186668, 48.958276118), (6.735497204, 50.364483524), (4.061941334, 52.915977114))
                ThreePointArc((4.061941334, 52.915977114), (0.001100002, 54.998999999), (-4.059824649, 52.916139553))
                ThreePointArc((-4.059824649, 52.916139553), (-6.733482579, 50.364752909), (-10.151228289, 48.958682215))
                ThreePointArc((-10.151228289, 48.958682215), (-35.355239503, 35.355438615), (-48.958625045, 10.151504012))
                ThreePointArc((-48.958625045, 10.151504012), (-50.364491386, 6.734110404), (-52.915450018, 4.060601605))
                ThreePointArc((-52.915450018, 4.060601605), (-54.998, 0), (-52.915450018, -4.060601605))
                ThreePointArc((-52.915450018, -4.060601605), (-50.364491386, -6.734110404), (-48.958625045, -10.151504012))
            make_face()
            with Locations(Location((0, -50, 0), (0, 0, 134.979742882))):
                Circle(SKETCH23_R, mode=Mode.SUBTRACT)
            with Locations(Location((50, 0, 0), (0, 0, 270))):
                Circle(SKETCH23_R, mode=Mode.SUBTRACT)
            with Locations(Location((-50, 0, 0), (0, 0, 89.971352109))):
                Circle(SKETCH23_R, mode=Mode.SUBTRACT)
            with Locations(Location((0, 50, 0), (0, 0, 44.979742883))):
                Circle(SKETCH23_R, mode=Mode.SUBTRACT)
            with BuildLine():
                ThreePointArc((-42.213853702, 18.275408495), (-44.165553177, 16.074946736), (-44.084894193, 13.134766994))
                ThreePointArc((-44.084894193, 13.134766994), (-46, 0), (-44.084894193, -13.134766994))
                ThreePointArc((-44.084894193, -13.134766994), (-44.165553177, -16.074946736), (-42.213853702, -18.275408495))
                ThreePointArc((-42.213853702, -18.275408495), (-35.238044383, -29.568230046), (-25.328122743, -38.399039029))
                ThreePointArc((-25.328122743, -38.399039029), (-23.5, -40.703193978), (-20.590481909, -41.13431724))
                ThreePointArc((-20.590481909, -41.13431724), (-7.987816173, -45.301156639), (5.27995883, -45.695973945))
                ThreePointArc((5.27995883, -45.695973945), (8.16146435, -46.285964392), (10.667405207, -44.746021791))
                ThreePointArc((10.667405207, -44.746021791), (23, -39.837168574), (33.417488986, -31.611254798))
                ThreePointArc((33.417488986, -31.611254798), (36.004088827, -30.211017655), (36.933894872, -27.42056545))
                ThreePointArc((36.933894872, -27.42056545), (43.225860556, -15.732926593), (45.918604651, -2.735278211))
                ThreePointArc((45.918604651, -2.735278211), (47, 0), (45.918604651, 2.735278211))
                ThreePointArc((45.918604651, 2.735278211), (43.225860556, 15.732926593), (36.933894872, 27.42056545))
                ThreePointArc((36.933894872, 27.42056545), (36.004088827, 30.211017655), (33.417488986, 31.611254798))
                ThreePointArc((33.417488986, 31.611254798), (23, 39.837168574), (10.667405207, 44.746021791))
                ThreePointArc((10.667405207, 44.746021791), (8.16146435, 46.285964392), (5.27995883, 45.695973945))
                ThreePointArc((5.27995883, 45.695973945), (-7.987816173, 45.301156639), (-20.590481909, 41.13431724))
                ThreePointArc((-20.590481909, 41.13431724), (-23.5, 40.703193978), (-25.328122743, 38.399039029))
                ThreePointArc((-25.328122743, 38.399039029), (-35.238044383, 29.568230046), (-42.213853702, 18.275408495))
            make_face(mode=Mode.SUBTRACT)
        extrude(amount=BOSS_EXTRUDE12_DEPTH)

    # Sketch24 → Cut-Extrude14 (cut)
    with SkipClean():  # the faces are left unmerged after this step: merging them gives an invalid solid
        with BuildSketch(Plane(origin=(0, 33, 0), x_dir=(1, 0, 0), z_dir=(0, 1, 0)).offset(CUT_EXTRUDE14_START)):
            with Locations(Location((0, 0, 0), (0, 0, 270))):
                Circle(SKETCH24_R)
            Circle(SKETCH24_R_2, mode=Mode.SUBTRACT)
        extrude(amount=CUT_EXTRUDE14_DEPTH, mode=Mode.SUBTRACT)

    # Sketch25 → Cut-Extrude15 (cut)
    with SkipClean():  # the faces are left unmerged after this step: merging them gives an invalid solid
        with BuildSketch(Plane(origin=(0, 33, 0), x_dir=(1, 0, 0), z_dir=(0, 1, 0))):
            with Locations((55, 0)):
                Rectangle(SKETCH25_W, SKETCH25_H)
        extrude(amount=-CUT_EXTRUDE15_DEPTH, mode=Mode.SUBTRACT)

    # Chamfer1
    chamfer1_edges = [part.edges().sort_by_distance(p)[0] for p in [
        (0, 3.7, -39.25),
    ]]
    chamfer(chamfer1_edges, length=CHAMFER1_SIZE)


solid = part.part
